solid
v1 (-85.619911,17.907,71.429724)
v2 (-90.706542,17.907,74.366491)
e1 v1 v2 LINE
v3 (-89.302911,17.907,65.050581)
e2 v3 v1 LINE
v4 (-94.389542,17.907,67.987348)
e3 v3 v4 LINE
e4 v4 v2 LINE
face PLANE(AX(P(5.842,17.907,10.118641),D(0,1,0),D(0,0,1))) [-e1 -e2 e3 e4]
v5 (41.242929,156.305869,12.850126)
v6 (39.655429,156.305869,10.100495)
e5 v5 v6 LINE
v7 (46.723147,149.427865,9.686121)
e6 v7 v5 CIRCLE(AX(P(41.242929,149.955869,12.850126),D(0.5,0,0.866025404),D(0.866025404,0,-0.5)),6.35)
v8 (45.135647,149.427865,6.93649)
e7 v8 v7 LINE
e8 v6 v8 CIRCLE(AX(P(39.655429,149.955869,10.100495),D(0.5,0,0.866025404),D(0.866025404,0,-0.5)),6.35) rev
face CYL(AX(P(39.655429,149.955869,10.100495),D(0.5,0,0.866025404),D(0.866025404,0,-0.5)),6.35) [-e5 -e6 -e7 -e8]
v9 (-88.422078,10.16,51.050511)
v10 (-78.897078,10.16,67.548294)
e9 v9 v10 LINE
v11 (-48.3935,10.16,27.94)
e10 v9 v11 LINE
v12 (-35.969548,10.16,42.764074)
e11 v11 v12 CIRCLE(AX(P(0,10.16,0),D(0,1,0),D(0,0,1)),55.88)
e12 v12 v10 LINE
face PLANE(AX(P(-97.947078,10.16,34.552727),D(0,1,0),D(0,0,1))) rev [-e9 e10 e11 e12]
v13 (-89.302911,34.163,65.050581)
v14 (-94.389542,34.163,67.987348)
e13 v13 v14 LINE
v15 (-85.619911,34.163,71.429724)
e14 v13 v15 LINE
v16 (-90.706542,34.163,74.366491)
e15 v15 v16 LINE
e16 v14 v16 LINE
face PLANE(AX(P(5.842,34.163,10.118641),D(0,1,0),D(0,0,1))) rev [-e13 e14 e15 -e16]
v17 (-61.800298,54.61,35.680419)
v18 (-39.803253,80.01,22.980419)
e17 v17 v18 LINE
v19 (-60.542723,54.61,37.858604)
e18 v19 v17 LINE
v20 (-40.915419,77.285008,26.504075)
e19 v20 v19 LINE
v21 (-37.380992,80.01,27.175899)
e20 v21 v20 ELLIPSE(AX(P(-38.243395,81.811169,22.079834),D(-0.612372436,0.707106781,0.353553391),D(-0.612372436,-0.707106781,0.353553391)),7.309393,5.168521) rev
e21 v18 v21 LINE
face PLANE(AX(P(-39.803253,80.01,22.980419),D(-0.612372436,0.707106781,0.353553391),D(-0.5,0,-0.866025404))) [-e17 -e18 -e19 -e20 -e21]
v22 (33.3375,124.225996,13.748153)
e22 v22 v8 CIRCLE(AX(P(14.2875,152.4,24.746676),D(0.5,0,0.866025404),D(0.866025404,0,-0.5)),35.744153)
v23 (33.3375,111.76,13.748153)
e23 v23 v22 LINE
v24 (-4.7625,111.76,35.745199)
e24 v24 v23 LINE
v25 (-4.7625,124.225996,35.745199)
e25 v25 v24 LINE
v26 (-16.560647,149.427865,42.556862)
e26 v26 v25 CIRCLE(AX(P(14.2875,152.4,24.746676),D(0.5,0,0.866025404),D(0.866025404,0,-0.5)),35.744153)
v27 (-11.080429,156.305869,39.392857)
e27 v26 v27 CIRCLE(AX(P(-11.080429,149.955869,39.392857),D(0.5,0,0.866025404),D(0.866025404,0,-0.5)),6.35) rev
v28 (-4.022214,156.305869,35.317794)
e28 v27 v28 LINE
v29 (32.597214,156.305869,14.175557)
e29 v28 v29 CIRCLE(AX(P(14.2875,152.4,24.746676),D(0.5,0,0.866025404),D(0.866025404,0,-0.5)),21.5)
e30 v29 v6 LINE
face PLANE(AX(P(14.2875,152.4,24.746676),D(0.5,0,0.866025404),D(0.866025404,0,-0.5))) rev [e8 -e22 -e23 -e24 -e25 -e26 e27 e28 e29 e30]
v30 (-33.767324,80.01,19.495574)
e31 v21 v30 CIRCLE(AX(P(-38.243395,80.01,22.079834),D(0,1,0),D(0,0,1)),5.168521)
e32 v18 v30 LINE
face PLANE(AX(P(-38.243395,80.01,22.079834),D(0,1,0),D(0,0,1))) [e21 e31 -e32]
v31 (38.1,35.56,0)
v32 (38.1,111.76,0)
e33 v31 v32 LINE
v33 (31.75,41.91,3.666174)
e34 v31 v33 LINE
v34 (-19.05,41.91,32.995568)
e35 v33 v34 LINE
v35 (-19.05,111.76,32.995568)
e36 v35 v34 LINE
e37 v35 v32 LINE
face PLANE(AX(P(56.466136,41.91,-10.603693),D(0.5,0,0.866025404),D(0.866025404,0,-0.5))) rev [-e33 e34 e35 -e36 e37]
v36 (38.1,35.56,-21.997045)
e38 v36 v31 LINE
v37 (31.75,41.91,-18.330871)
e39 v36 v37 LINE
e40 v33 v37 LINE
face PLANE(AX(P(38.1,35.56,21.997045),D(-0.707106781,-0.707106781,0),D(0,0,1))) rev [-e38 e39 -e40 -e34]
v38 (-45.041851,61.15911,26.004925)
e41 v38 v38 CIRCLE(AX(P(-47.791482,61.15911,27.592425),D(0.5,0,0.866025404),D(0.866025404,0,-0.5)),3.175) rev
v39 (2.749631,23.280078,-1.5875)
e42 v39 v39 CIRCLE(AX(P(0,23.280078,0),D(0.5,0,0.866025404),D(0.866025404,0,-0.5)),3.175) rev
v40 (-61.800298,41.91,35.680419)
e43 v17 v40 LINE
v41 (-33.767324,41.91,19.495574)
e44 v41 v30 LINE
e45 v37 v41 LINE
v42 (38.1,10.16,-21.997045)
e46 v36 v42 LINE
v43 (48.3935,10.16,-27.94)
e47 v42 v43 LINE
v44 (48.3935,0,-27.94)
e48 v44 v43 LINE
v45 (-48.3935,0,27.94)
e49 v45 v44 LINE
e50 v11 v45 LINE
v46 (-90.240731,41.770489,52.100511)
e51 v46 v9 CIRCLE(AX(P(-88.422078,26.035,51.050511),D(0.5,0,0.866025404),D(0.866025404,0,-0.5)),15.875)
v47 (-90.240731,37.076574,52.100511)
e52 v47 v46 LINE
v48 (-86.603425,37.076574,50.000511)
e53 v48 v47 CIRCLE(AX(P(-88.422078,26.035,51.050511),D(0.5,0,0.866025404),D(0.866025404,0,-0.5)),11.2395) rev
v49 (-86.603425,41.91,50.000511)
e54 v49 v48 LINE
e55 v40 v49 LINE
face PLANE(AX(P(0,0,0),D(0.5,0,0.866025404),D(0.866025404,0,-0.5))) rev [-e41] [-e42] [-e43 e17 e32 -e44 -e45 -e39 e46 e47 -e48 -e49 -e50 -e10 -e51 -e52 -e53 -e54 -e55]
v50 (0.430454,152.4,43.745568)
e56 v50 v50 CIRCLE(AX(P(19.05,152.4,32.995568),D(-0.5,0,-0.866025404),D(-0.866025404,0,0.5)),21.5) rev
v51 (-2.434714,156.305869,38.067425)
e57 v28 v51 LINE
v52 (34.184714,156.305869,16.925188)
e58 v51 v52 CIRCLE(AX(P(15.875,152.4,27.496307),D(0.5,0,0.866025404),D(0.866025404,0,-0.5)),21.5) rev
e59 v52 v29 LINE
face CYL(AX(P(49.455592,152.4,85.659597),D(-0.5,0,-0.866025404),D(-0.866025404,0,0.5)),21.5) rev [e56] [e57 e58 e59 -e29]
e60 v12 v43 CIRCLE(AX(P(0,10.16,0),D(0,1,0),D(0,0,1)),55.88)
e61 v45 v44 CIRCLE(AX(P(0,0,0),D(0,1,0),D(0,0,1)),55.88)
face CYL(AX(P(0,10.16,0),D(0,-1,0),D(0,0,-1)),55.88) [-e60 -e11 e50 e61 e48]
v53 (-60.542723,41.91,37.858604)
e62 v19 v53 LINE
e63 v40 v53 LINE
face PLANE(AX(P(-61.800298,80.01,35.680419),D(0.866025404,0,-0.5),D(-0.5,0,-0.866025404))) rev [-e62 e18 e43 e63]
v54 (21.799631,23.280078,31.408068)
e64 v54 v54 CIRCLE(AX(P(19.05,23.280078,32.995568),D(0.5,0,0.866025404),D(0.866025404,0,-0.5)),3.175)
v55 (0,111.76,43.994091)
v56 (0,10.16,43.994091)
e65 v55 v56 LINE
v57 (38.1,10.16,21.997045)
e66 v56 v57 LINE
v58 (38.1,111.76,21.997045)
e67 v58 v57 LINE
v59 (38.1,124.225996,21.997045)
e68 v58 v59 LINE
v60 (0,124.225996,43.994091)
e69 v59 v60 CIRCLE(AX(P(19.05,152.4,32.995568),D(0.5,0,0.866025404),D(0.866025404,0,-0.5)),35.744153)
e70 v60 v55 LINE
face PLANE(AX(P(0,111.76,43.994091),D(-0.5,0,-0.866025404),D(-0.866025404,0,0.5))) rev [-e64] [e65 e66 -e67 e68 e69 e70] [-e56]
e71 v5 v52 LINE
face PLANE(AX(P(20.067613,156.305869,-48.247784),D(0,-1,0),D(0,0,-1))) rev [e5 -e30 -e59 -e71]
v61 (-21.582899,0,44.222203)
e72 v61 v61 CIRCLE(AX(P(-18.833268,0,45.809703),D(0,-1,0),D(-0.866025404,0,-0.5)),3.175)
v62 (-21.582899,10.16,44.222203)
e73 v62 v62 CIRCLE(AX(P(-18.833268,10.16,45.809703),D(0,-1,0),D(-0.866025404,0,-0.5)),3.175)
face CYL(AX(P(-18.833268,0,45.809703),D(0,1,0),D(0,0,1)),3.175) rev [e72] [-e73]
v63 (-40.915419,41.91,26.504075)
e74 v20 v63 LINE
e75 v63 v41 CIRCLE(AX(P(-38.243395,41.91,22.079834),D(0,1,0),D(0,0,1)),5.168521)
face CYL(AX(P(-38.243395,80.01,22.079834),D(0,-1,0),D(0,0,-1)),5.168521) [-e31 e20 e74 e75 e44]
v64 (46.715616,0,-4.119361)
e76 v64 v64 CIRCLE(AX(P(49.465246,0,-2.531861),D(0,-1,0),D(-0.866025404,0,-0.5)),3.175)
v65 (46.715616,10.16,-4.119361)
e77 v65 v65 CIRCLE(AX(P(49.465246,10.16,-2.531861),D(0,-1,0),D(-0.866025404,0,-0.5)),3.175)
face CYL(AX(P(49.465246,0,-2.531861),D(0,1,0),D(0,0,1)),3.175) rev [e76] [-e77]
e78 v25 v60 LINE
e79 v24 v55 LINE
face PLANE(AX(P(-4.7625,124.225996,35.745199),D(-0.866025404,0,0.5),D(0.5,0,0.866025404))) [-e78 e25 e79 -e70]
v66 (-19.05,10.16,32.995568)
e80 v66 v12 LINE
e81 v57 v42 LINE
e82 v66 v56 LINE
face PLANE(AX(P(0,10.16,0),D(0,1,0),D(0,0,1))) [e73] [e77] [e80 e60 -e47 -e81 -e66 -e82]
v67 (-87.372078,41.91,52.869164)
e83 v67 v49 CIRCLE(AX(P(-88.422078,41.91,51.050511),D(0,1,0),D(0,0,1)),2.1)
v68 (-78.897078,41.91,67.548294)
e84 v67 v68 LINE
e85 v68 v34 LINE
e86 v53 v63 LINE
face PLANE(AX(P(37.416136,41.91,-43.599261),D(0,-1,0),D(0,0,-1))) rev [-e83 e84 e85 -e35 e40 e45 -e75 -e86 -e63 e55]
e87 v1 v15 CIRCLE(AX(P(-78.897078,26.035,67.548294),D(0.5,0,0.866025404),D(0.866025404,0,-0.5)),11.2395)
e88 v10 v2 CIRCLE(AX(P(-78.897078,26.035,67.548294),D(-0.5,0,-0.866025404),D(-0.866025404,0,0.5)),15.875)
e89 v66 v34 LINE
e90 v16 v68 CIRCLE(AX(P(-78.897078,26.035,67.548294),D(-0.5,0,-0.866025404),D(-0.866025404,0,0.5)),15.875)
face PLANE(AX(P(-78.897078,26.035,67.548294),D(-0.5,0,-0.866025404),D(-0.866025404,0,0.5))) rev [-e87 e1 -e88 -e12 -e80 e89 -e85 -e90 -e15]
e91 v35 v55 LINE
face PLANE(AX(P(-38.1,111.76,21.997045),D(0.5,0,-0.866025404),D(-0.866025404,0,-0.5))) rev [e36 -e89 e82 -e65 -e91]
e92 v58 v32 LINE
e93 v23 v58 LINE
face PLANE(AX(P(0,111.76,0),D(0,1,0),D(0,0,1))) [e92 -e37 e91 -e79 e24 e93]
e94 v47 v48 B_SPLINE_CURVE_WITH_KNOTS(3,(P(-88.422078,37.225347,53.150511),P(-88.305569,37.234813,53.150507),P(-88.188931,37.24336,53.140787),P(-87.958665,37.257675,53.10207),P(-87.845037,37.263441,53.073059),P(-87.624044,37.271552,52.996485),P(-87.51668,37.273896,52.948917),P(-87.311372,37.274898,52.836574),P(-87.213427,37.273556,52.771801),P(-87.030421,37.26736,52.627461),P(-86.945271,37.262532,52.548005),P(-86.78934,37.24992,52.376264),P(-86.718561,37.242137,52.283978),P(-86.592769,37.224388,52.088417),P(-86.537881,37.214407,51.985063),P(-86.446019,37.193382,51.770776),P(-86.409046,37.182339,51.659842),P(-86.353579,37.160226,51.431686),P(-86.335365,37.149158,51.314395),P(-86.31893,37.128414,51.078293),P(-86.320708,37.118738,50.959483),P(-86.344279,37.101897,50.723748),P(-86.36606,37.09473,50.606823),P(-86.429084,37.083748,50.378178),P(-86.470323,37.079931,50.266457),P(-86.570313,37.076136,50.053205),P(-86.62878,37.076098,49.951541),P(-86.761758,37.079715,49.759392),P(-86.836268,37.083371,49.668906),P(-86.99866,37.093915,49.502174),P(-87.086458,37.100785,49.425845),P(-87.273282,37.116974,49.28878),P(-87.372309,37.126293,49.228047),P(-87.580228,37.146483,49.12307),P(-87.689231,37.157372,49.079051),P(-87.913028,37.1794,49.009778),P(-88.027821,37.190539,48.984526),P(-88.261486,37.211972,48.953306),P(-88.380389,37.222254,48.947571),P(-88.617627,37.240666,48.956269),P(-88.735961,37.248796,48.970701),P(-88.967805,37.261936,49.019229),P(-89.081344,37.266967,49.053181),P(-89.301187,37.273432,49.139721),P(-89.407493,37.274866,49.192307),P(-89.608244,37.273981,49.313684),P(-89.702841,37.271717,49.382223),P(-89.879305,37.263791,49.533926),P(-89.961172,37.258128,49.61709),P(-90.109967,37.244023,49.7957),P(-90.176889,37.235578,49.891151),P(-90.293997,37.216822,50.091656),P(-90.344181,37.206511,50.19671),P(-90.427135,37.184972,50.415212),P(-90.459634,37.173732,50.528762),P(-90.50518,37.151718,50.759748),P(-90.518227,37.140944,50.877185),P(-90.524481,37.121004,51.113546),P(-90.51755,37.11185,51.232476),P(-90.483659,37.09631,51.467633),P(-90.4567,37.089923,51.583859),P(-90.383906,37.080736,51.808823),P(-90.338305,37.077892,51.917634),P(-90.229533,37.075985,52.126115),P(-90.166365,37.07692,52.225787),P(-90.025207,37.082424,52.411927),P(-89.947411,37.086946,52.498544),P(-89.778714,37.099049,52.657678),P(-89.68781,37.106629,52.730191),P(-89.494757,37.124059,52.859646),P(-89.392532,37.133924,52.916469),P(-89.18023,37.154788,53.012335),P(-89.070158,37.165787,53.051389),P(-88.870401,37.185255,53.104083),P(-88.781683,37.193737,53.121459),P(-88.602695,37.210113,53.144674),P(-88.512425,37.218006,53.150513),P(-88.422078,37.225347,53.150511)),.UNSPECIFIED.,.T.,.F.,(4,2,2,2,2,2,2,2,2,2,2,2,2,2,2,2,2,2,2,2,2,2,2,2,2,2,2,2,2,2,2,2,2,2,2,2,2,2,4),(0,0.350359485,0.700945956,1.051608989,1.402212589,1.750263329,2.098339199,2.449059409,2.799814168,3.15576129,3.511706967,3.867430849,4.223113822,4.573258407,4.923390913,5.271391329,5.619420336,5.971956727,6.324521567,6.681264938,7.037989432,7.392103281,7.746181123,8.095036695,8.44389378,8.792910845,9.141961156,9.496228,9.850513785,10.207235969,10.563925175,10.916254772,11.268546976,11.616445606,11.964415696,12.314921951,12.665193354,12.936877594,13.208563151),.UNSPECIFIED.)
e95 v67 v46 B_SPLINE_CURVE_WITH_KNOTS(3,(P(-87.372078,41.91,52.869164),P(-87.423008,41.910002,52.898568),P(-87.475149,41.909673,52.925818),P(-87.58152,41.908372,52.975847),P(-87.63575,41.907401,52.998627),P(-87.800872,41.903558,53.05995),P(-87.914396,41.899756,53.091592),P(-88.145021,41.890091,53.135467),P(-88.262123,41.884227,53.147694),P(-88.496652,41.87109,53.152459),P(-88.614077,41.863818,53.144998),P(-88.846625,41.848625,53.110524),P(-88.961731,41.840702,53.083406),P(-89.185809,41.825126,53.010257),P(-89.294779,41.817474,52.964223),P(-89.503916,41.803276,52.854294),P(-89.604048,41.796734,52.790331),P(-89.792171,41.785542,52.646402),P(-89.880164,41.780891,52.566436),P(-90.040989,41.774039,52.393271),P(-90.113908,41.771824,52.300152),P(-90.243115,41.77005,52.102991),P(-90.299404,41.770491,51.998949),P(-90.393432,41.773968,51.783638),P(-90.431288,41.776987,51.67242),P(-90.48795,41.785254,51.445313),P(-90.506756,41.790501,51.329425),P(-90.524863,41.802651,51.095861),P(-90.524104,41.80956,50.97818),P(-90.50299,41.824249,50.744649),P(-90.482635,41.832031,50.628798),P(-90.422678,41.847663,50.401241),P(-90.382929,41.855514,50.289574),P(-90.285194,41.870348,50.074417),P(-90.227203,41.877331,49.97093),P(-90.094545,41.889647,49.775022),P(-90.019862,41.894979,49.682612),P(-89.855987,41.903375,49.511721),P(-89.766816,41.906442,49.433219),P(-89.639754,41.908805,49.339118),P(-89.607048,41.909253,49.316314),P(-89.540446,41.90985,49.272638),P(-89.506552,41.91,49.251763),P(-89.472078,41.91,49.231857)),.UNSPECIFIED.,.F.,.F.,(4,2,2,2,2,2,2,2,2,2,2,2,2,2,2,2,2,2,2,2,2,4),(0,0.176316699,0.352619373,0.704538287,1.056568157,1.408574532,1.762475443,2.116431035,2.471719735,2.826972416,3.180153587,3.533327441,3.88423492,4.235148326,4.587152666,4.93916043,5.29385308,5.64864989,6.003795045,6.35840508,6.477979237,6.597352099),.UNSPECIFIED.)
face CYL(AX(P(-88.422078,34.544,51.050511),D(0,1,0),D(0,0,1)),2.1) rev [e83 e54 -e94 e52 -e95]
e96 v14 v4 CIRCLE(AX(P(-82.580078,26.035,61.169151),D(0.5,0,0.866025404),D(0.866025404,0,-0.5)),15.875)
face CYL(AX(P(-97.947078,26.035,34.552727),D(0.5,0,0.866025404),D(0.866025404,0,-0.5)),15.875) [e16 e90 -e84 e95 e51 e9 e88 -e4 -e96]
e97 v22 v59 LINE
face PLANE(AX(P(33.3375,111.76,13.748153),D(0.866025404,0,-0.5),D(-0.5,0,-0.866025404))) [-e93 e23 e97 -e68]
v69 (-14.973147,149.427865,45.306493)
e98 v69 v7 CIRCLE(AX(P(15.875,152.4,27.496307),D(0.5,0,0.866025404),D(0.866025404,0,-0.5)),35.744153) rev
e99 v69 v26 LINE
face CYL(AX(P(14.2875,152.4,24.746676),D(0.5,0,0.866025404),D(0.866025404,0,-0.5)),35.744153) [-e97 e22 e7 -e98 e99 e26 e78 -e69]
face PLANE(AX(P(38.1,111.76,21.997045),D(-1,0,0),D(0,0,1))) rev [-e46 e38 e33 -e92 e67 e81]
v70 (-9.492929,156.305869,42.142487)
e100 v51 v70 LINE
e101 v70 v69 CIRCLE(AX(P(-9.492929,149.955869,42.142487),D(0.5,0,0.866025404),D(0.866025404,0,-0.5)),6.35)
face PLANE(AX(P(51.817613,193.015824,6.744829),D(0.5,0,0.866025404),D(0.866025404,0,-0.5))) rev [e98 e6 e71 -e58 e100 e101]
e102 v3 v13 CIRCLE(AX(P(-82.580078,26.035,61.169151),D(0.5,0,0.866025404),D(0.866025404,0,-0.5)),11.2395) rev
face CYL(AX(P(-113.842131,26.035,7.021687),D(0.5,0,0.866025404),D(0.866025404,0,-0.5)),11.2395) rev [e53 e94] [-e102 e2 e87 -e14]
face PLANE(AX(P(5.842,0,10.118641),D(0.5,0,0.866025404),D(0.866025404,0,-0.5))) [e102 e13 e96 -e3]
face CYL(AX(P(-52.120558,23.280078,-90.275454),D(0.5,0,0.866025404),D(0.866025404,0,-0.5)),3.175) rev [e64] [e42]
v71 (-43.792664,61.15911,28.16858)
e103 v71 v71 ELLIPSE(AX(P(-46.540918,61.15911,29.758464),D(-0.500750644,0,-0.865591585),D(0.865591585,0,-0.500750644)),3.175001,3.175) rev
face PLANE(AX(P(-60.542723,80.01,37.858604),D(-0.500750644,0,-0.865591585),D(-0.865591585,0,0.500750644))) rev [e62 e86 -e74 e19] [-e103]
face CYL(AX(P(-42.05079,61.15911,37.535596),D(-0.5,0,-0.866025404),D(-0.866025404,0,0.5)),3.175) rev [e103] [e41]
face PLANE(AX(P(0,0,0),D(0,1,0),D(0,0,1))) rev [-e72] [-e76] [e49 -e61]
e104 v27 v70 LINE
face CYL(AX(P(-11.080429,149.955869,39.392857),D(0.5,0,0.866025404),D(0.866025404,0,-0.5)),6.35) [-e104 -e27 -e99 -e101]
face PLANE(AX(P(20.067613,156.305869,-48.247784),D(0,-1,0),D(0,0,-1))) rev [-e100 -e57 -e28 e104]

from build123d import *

# Parameters (mm, degrees)
SKETCH4_R            = 55.88
BOSS_EXTRUDE2_DEPTH  = 10.16
BOSS_EXTRUDE4_DEPTH  = 101.6
BOSS_EXTRUDE5_DEPTH  = 9.525
BOSS_EXTRUDE6_START  = -9.525
BOSS_EXTRUDE6_DEPTH  = 9.525
CUT_EXTRUDE4_REACH   = 223.16
SKETCH12_R           = 21.5
SKETCH13_W           = 38.1
SKETCH13_H           = 69.85
CUT_EXTRUDE5_DEPTH   = 76.2
BOSS_EXTRUDE10_DEPTH = 19.05
SKETCH28_R           = 11.2395
CUT_EXTRUDE9_DEPTH   = 38.1
CUT_EXTRUDE10_DEPTH  = 7.366
CHAMFER1_SIZE        = 6.35
SKETCH30_R           = 2.1
CUT_EXTRUDE11_DEPTH  = 7.366
SKETCH31_R           = 3.175
CUT_EXTRUDE12_DEPTH  = 223.900333216
BOSS_EXTRUDE11_DEPTH = 38.1
CHAMFER2_SIZE        = 25.4
CUT_EXTRUDE13_REACH  = 233.204
SKETCH34_R           = 3.175
SKETCH35_R           = 3.175
CUT_EXTRUDE14_DEPTH  = 246.746626534
SKETCH36_W           = 63.5
SKETCH36_H           = 36.709955102
CUT_EXTRUDE15_DEPTH  = 63.5
FILLET1_R            = 6.35
SKETCH37_W           = 210.742334846
SKETCH37_H           = 201.224939079
CUT_EXTRUDE16_DEPTH  = 232.093968202


with BuildPart() as part:
    # Sketch4 → Boss-Extrude2 (new body)
    with BuildSketch(Plane(origin=(0, 0, 0), x_dir=(1, 0, 0), z_dir=(0, 1, 0))):
        with Locations(Location((0, 0, 0), (0, 0, 270))):
            Circle(SKETCH4_R)
    extrude(amount=BOSS_EXTRUDE2_DEPTH)

    # Sketch8 → Boss-Extrude4 (add)
    with BuildSketch(Plane(origin=(0, 10.16, 0), x_dir=(1, 0, 0), z_dir=(0, 1, 0))):
        Polygon((0, 43.994090512), (-38.1, 21.997045256), (-38.1, -21.997045256), (0, -43.994090512), (38.1, -21.997045256), (38.1, 21.997045256), align=None)
    extrude(amount=BOSS_EXTRUDE4_DEPTH)

    # Sketch9 → Boss-Extrude5 (add)
    with BuildSketch(Plane(origin=(-19.05, 0, -32.995567884), x_dir=(-0.8660254037844386, 0, 0.5000000000000003), z_dir=(-0.5000000000000002, 0, -0.8660254037844385))):
        with BuildLine():
            Line((21.997045256, 111.76), (-21.997045256, 111.76))
            Line((-21.997045256, 111.76), (-21.997045256, 124.225996336))
            ThreePointArc((-21.997045256, 124.225996336), (0, 188.144153123), (21.997045256, 124.225996336))
            Line((21.997045256, 124.225996336), (21.997045256, 111.76))
        make_face()
    extrude(amount=-BOSS_EXTRUDE5_DEPTH)

    # Sketch10 → Boss-Extrude6 (add)
    with BuildSketch(Plane(origin=(19.05, 0, 32.995567884), x_dir=(0.8660254037844386, 0, -0.5000000000000001), z_dir=(0.5000000000000001, 0, 0.8660254037844386)).offset(BOSS_EXTRUDE6_START)):
        with BuildLine():
            Line((-21.997045256, 111.76), (21.997045256, 111.76))
            Line((21.997045256, 111.76), (21.997045256, 124.225996336))
            ThreePointArc((21.997045256, 124.225996336), (0, 188.144153123), (-21.997045256, 124.225996336))
            Line((-21.997045256, 124.225996336), (-21.997045256, 111.76))
        make_face()
    extrude(amount=BOSS_EXTRUDE6_DEPTH)

    # Cut-Extrude4: up to this face of the body (flat: up to its plane)
    cut_extrude4_end = Plane(part.part.faces().sort_by_distance((19.05, 104.643172711, 32.995567884))[0])
    # Sketch12 → Cut-Extrude4 (cut, up to the picked face)
    with BuildSketch(Plane(origin=(-19.05, 0, -32.995567884), x_dir=(-0.8660254037844386, 0, 0.5000000000000003), z_dir=(-0.5000000000000002, 0, -0.8660254037844385)), mode=Mode.PRIVATE) as cut_extrude4_sk1:
        with Locations((0, 152.4)):
            Circle(SKETCH12_R)
    cut_extrude4_tool1 = split(extrude(cut_extrude4_sk1.sketch, amount=-CUT_EXTRUDE4_REACH, mode=Mode.PRIVATE), bisect_by=cut_extrude4_end, keep=Keep.BOTH, mode=Mode.PRIVATE)
    add(cut_extrude4_tool1.solids().sort_by(Axis((-19.05, 152.4, -32.995568), (0.5000000000000002, 0, 0.8660254037844385)))[0], mode=Mode.SUBTRACT)

    # Sketch13 → Cut-Extrude5 (cut, symmetric)
    with BuildSketch(Plane(origin=(-19.05, 0, 10.998522628), x_dir=(0.5000000000000002, 0, 0.8660254037844386), z_dir=(-0.8660254037844385, 0, 0.5000000000000001))):
        with Locations((0, 76.835)):
            Rectangle(SKETCH13_W, SKETCH13_H)
    extrude(amount=CUT_EXTRUDE5_DEPTH, both=True, mode=Mode.SUBTRACT)

    # Sketch22 → Boss-Extrude10 (add, symmetric)
    with BuildSketch(Plane(origin=(0, 0, 0), x_dir=(-0.8660254037844386, 0, 0.5000000000000001), z_dir=(-0.5000000000000001, 0, -0.8660254037844386))):
        with BuildLine():
            Line((43.994090512, 41.91), (102.10102108, 41.91))
            ThreePointArc((102.10102108, 41.91), (117.97602108, 26.035), (102.10102108, 10.16))
            Line((102.10102108, 10.16), (43.994090512, 10.16))
            Line((43.994090512, 10.16), (21.997045256, 10.16))
            Line((21.997045256, 10.16), (21.997045256, 41.91))
            Line((21.997045256, 41.91), (43.994090512, 41.91))
        make_face()
    extrude(amount=BOSS_EXTRUDE10_DEPTH, both=True)

    # Sketch28 → Cut-Extrude9 (cut)
    with BuildSketch(Plane(origin=(9.525, 0, 16.497783942), x_dir=(0.8660254037844386, 0, -0.5000000000000001), z_dir=(0.5000000000000001, 0, 0.8660254037844386))):
        with Locations((-102.10102108, 26.035)):
            Circle(SKETCH28_R)
    extrude(amount=-CUT_EXTRUDE9_DEPTH, mode=Mode.SUBTRACT)

    # Sketch29 → Cut-Extrude10 (cut)
    with BuildSketch(Plane(origin=(9.525, 0, 16.497783942), x_dir=(0.8660254037844386, 0, -0.5000000000000001), z_dir=(0.5000000000000001, 0, 0.8660254037844386))):
        with BuildLine():
            Line((-115.737415068, 17.907), (-109.863879848, 17.907))
            ThreePointArc((-109.863879848, 17.907), (-113.34052108, 26.035), (-109.863879848, 34.163))
            Line((-109.863879848, 34.163), (-115.737415068, 34.163))
            ThreePointArc((-115.737415068, 34.163), (-117.97602108, 26.035), (-115.737415068, 17.907))
        make_face()
    extrude(amount=-CUT_EXTRUDE10_DEPTH, mode=Mode.SUBTRACT)

    # Chamfer1
    chamfer1_edges = [part.edges().sort_by_distance(p)[0] for p in [
        (38.1, 41.91, -10.998522628),
        (28.575, 41.91, -27.49630657),
    ]]
    chamfer(chamfer1_edges, length=CHAMFER1_SIZE)

    # Sketch30 → Cut-Extrude11 (cut)
    with BuildSketch(Plane(origin=(0, 41.91, 0), x_dir=(1, 0, 0), z_dir=(0, 1, 0))):
        with Locations(Location((-88.422078008, -51.05051054, 0), (0, 0, 270))):
            Circle(SKETCH30_R)
    extrude(amount=-CUT_EXTRUDE11_DEPTH, mode=Mode.SUBTRACT)

    # Sketch31 → Cut-Extrude12 (cut, through all)
    with BuildSketch(Plane(origin=(0, 10.16, 0), x_dir=(1, 0, 0), z_dir=(0, 1, 0))):
        with Locations(Location((-49.089000823, 6.594762938, 0), (0, 0, 270))):
            Circle(SKETCH31_R)
        with Locations(Location((26.925278647, 41.57222955, 0), (0, 0, 270))):
            Circle(SKETCH31_R)
    cut_extrude12 = extrude(amount=-CUT_EXTRUDE12_DEPTH, mode=Mode.SUBTRACT)

    # Mirror1: Cut-Extrude12 across plane
    add(cut_extrude12.mirror(Plane(origin=(0, 0, 0), x_dir=(-0.8660254037844386, 0, 0.5000000000000001), z_dir=(-0.5000000000000001, 0, -0.8660254037844386))), mode=Mode.SUBTRACT)

    # Sketch33 → Boss-Extrude11 (add)
    with BuildSketch(Plane(origin=(0, 41.91, 0), x_dir=(1, 0, 0), z_dir=(0, 1, 0))):
        with BuildLine():
            Line((-43.411916389, -22.079834386), (-63.092428819, -33.442383535))
            Line((-63.092428819, -33.442383535), (-61.800298466, -35.680418955))
            Line((-61.800298466, -35.680418955), (-60.542722832, -37.858603849))
            Line((-60.542722832, -37.858603849), (-40.91541904, -26.504074545))
            ThreePointArc((-40.91541904, -26.504074545), (-33.742060338, -19.539834386), (-43.411916389, -22.079834386))
        make_face()
    extrude(amount=BOSS_EXTRUDE11_DEPTH)

    # Chamfer2
    chamfer2_edges = [part.edges().sort_by_distance(p)[0] for p in [
        (-61.817575825, 80.01, 35.650493692),
    ]]
    chamfer(chamfer2_edges, length=CHAMFER2_SIZE)

    # Cut-Extrude13: up to this plane
    cut_extrude13_end = Plane(origin=(-60.542722832, 80.01, 37.858603849), z_dir=(-0.500750644235671, 0, -0.8655915851587056))
    # Sketch34 → Cut-Extrude13 (cut, up to the surface)
    with BuildSketch(Plane(origin=(-1.292130352, 0, -2.23803542), x_dir=(-0.8660254037844386, 0, 0.5000000000000003), z_dir=(-0.5000000000000002, 0, -0.8660254037844385)), mode=Mode.PRIVATE) as cut_extrude13_sk1:
        with Locations((55.184849848, 61.159110234)):
            Circle(SKETCH34_R)
    cut_extrude13_tool1 = split(extrude(cut_extrude13_sk1.sketch, amount=-CUT_EXTRUDE13_REACH, mode=Mode.PRIVATE), bisect_by=cut_extrude13_end, keep=Keep.BOTH, mode=Mode.PRIVATE)
    add(cut_extrude13_tool1.solids().sort_by_distance((-49.083612, 61.15911, 25.35439))[0], mode=Mode.SUBTRACT)

    # Sketch35 → Cut-Extrude14 (cut, through all)
    with BuildSketch(Plane(origin=(19.05, 0, 32.995567884), x_dir=(0.8660254037844386, 0, -0.5000000000000001), z_dir=(0.5000000000000001, 0, 0.8660254037844386))):
        with Locations((0, 23.280078313)):
            Circle(SKETCH35_R)
    extrude(amount=-CUT_EXTRUDE14_DEPTH, mode=Mode.SUBTRACT)

    # Sketch36 → Cut-Extrude15 (cut, symmetric)
    with BuildSketch(Plane(origin=(-19.05, 0, 10.998522628), x_dir=(0.5000000000000004, 0, 0.8660254037844384), z_dir=(-0.8660254037844384, 0, 0.5000000000000004))):
        with Locations((0, 174.660846527)):
            Rectangle(SKETCH36_W, SKETCH36_H)
    extrude(amount=CUT_EXTRUDE15_DEPTH, both=True, mode=Mode.SUBTRACT)

    # Fillet1
    # the kernel refuses this fillet: 6.35 mm, written as the material it takes off along each edge
    with BuildSketch(Plane(origin=(12.272597523, 156.305868976, -21.027711652), x_dir=(0.04103819462533737, -0.9988766133891899, -0.023693412713994805), z_dir=(-0.5000000000000003, 0, -0.8660254037844386))) as fillet1_piece_1:
        with BuildLine():
            CenterArc((6.655634068, -6.291985478), FILLET1_R, 97.750867839, 84.965214409)
            Line((0.312767573, -6.592891819), (0, 0))
            ThreePointArc((0, 0), (2.899617679, -0.196427123), (5.799235358, 0))
        make_face()
    extrude(amount=19.675766287, mode=Mode.SUBTRACT)
    with BuildSketch(Plane(origin=(-24.346831236, 156.305868976, 0.114525399), x_dir=(-0.04103819462533767, -0.9988766133891899, 0.023693412713994975), z_dir=(-0.5000000000000003, 0, -0.8660254037844386))) as fillet1_piece_2:
        with BuildLine():
            CenterArc((6.655634068, 6.291985478), FILLET1_R, 177.283917752, 84.965214409)
            Line((0.312767573, 6.592891819), (0, 0))
            ThreePointArc((0, 0), (2.899617679, 0.196427123), (5.799235358, 0))
        make_face()
    extrude(amount=19.675766287, mode=Mode.SUBTRACT)
    with BuildSketch(Plane(origin=(-14.894977291, 156.305868976, 45.261361242), x_dir=(-0.011364190914464473, -0.999913899736612, 0.0065611186835884), z_dir=(-0.5000000000000002, 0, -0.8660254037844386)), Plane(origin=(-36.459231913, 156.305868976, 7.91097661), x_dir=(-0.011364190914463116, -0.999913899736612, 0.0065611186835876165), z_dir=(-0.5000000000000002, 0, -0.8660254037844386))) as fillet1_piece_3:
        with BuildLine():
            CenterArc((6.26760006, -6.320536654), FILLET1_R, 84.478464497, 94.769665105)
            Line((-0.081853204, -6.237210446), (0, 0))
            ThreePointArc((0, 0), (3.439298151, 0.165849191), (6.878596303, 0))
        make_face()
    extrude(amount=20.371490756, mode=Mode.SUBTRACT)
    with BuildSketch(Plane(origin=(25.080722669, 156.305868976, -27.619132734), x_dir=(0.011364190914465366, -0.999913899736612, -0.00656111868358885), z_dir=(-0.5000000000000002, 0, -0.8660254037844386)), Plane(origin=(46.644977291, 156.305868976, 9.731251898), x_dir=(0.011364190914466365, -0.999913899736612, -0.006561118683589426), z_dir=(-0.5000000000000002, 0, -0.8660254037844386))) as fillet1_piece_4:
        with BuildLine():
            CenterArc((6.26760006, 6.320536654), FILLET1_R, 180.751870398, 94.769665105)
            Line((-0.081853204, 6.237210446), (0, 0))
            ThreePointArc((0, 0), (3.439298151, -0.165849191), (6.878596303, 0))
        make_face()
    extrude(amount=20.371490756, mode=Mode.SUBTRACT)

    # Sketch37 → Cut-Extrude16 (cut, through all)
    with BuildSketch(Plane(origin=(0, 0, 0), x_dir=(-0.8660254037844386, 0, 0.5000000000000001), z_dir=(-0.5000000000000001, 0, -0.8660254037844386))):
        with Locations((30.487295463, 97.29801522)):
            Rectangle(SKETCH37_W, SKETCH37_H)
    extrude(amount=CUT_EXTRUDE16_DEPTH, mode=Mode.SUBTRACT)


solid = part.part
